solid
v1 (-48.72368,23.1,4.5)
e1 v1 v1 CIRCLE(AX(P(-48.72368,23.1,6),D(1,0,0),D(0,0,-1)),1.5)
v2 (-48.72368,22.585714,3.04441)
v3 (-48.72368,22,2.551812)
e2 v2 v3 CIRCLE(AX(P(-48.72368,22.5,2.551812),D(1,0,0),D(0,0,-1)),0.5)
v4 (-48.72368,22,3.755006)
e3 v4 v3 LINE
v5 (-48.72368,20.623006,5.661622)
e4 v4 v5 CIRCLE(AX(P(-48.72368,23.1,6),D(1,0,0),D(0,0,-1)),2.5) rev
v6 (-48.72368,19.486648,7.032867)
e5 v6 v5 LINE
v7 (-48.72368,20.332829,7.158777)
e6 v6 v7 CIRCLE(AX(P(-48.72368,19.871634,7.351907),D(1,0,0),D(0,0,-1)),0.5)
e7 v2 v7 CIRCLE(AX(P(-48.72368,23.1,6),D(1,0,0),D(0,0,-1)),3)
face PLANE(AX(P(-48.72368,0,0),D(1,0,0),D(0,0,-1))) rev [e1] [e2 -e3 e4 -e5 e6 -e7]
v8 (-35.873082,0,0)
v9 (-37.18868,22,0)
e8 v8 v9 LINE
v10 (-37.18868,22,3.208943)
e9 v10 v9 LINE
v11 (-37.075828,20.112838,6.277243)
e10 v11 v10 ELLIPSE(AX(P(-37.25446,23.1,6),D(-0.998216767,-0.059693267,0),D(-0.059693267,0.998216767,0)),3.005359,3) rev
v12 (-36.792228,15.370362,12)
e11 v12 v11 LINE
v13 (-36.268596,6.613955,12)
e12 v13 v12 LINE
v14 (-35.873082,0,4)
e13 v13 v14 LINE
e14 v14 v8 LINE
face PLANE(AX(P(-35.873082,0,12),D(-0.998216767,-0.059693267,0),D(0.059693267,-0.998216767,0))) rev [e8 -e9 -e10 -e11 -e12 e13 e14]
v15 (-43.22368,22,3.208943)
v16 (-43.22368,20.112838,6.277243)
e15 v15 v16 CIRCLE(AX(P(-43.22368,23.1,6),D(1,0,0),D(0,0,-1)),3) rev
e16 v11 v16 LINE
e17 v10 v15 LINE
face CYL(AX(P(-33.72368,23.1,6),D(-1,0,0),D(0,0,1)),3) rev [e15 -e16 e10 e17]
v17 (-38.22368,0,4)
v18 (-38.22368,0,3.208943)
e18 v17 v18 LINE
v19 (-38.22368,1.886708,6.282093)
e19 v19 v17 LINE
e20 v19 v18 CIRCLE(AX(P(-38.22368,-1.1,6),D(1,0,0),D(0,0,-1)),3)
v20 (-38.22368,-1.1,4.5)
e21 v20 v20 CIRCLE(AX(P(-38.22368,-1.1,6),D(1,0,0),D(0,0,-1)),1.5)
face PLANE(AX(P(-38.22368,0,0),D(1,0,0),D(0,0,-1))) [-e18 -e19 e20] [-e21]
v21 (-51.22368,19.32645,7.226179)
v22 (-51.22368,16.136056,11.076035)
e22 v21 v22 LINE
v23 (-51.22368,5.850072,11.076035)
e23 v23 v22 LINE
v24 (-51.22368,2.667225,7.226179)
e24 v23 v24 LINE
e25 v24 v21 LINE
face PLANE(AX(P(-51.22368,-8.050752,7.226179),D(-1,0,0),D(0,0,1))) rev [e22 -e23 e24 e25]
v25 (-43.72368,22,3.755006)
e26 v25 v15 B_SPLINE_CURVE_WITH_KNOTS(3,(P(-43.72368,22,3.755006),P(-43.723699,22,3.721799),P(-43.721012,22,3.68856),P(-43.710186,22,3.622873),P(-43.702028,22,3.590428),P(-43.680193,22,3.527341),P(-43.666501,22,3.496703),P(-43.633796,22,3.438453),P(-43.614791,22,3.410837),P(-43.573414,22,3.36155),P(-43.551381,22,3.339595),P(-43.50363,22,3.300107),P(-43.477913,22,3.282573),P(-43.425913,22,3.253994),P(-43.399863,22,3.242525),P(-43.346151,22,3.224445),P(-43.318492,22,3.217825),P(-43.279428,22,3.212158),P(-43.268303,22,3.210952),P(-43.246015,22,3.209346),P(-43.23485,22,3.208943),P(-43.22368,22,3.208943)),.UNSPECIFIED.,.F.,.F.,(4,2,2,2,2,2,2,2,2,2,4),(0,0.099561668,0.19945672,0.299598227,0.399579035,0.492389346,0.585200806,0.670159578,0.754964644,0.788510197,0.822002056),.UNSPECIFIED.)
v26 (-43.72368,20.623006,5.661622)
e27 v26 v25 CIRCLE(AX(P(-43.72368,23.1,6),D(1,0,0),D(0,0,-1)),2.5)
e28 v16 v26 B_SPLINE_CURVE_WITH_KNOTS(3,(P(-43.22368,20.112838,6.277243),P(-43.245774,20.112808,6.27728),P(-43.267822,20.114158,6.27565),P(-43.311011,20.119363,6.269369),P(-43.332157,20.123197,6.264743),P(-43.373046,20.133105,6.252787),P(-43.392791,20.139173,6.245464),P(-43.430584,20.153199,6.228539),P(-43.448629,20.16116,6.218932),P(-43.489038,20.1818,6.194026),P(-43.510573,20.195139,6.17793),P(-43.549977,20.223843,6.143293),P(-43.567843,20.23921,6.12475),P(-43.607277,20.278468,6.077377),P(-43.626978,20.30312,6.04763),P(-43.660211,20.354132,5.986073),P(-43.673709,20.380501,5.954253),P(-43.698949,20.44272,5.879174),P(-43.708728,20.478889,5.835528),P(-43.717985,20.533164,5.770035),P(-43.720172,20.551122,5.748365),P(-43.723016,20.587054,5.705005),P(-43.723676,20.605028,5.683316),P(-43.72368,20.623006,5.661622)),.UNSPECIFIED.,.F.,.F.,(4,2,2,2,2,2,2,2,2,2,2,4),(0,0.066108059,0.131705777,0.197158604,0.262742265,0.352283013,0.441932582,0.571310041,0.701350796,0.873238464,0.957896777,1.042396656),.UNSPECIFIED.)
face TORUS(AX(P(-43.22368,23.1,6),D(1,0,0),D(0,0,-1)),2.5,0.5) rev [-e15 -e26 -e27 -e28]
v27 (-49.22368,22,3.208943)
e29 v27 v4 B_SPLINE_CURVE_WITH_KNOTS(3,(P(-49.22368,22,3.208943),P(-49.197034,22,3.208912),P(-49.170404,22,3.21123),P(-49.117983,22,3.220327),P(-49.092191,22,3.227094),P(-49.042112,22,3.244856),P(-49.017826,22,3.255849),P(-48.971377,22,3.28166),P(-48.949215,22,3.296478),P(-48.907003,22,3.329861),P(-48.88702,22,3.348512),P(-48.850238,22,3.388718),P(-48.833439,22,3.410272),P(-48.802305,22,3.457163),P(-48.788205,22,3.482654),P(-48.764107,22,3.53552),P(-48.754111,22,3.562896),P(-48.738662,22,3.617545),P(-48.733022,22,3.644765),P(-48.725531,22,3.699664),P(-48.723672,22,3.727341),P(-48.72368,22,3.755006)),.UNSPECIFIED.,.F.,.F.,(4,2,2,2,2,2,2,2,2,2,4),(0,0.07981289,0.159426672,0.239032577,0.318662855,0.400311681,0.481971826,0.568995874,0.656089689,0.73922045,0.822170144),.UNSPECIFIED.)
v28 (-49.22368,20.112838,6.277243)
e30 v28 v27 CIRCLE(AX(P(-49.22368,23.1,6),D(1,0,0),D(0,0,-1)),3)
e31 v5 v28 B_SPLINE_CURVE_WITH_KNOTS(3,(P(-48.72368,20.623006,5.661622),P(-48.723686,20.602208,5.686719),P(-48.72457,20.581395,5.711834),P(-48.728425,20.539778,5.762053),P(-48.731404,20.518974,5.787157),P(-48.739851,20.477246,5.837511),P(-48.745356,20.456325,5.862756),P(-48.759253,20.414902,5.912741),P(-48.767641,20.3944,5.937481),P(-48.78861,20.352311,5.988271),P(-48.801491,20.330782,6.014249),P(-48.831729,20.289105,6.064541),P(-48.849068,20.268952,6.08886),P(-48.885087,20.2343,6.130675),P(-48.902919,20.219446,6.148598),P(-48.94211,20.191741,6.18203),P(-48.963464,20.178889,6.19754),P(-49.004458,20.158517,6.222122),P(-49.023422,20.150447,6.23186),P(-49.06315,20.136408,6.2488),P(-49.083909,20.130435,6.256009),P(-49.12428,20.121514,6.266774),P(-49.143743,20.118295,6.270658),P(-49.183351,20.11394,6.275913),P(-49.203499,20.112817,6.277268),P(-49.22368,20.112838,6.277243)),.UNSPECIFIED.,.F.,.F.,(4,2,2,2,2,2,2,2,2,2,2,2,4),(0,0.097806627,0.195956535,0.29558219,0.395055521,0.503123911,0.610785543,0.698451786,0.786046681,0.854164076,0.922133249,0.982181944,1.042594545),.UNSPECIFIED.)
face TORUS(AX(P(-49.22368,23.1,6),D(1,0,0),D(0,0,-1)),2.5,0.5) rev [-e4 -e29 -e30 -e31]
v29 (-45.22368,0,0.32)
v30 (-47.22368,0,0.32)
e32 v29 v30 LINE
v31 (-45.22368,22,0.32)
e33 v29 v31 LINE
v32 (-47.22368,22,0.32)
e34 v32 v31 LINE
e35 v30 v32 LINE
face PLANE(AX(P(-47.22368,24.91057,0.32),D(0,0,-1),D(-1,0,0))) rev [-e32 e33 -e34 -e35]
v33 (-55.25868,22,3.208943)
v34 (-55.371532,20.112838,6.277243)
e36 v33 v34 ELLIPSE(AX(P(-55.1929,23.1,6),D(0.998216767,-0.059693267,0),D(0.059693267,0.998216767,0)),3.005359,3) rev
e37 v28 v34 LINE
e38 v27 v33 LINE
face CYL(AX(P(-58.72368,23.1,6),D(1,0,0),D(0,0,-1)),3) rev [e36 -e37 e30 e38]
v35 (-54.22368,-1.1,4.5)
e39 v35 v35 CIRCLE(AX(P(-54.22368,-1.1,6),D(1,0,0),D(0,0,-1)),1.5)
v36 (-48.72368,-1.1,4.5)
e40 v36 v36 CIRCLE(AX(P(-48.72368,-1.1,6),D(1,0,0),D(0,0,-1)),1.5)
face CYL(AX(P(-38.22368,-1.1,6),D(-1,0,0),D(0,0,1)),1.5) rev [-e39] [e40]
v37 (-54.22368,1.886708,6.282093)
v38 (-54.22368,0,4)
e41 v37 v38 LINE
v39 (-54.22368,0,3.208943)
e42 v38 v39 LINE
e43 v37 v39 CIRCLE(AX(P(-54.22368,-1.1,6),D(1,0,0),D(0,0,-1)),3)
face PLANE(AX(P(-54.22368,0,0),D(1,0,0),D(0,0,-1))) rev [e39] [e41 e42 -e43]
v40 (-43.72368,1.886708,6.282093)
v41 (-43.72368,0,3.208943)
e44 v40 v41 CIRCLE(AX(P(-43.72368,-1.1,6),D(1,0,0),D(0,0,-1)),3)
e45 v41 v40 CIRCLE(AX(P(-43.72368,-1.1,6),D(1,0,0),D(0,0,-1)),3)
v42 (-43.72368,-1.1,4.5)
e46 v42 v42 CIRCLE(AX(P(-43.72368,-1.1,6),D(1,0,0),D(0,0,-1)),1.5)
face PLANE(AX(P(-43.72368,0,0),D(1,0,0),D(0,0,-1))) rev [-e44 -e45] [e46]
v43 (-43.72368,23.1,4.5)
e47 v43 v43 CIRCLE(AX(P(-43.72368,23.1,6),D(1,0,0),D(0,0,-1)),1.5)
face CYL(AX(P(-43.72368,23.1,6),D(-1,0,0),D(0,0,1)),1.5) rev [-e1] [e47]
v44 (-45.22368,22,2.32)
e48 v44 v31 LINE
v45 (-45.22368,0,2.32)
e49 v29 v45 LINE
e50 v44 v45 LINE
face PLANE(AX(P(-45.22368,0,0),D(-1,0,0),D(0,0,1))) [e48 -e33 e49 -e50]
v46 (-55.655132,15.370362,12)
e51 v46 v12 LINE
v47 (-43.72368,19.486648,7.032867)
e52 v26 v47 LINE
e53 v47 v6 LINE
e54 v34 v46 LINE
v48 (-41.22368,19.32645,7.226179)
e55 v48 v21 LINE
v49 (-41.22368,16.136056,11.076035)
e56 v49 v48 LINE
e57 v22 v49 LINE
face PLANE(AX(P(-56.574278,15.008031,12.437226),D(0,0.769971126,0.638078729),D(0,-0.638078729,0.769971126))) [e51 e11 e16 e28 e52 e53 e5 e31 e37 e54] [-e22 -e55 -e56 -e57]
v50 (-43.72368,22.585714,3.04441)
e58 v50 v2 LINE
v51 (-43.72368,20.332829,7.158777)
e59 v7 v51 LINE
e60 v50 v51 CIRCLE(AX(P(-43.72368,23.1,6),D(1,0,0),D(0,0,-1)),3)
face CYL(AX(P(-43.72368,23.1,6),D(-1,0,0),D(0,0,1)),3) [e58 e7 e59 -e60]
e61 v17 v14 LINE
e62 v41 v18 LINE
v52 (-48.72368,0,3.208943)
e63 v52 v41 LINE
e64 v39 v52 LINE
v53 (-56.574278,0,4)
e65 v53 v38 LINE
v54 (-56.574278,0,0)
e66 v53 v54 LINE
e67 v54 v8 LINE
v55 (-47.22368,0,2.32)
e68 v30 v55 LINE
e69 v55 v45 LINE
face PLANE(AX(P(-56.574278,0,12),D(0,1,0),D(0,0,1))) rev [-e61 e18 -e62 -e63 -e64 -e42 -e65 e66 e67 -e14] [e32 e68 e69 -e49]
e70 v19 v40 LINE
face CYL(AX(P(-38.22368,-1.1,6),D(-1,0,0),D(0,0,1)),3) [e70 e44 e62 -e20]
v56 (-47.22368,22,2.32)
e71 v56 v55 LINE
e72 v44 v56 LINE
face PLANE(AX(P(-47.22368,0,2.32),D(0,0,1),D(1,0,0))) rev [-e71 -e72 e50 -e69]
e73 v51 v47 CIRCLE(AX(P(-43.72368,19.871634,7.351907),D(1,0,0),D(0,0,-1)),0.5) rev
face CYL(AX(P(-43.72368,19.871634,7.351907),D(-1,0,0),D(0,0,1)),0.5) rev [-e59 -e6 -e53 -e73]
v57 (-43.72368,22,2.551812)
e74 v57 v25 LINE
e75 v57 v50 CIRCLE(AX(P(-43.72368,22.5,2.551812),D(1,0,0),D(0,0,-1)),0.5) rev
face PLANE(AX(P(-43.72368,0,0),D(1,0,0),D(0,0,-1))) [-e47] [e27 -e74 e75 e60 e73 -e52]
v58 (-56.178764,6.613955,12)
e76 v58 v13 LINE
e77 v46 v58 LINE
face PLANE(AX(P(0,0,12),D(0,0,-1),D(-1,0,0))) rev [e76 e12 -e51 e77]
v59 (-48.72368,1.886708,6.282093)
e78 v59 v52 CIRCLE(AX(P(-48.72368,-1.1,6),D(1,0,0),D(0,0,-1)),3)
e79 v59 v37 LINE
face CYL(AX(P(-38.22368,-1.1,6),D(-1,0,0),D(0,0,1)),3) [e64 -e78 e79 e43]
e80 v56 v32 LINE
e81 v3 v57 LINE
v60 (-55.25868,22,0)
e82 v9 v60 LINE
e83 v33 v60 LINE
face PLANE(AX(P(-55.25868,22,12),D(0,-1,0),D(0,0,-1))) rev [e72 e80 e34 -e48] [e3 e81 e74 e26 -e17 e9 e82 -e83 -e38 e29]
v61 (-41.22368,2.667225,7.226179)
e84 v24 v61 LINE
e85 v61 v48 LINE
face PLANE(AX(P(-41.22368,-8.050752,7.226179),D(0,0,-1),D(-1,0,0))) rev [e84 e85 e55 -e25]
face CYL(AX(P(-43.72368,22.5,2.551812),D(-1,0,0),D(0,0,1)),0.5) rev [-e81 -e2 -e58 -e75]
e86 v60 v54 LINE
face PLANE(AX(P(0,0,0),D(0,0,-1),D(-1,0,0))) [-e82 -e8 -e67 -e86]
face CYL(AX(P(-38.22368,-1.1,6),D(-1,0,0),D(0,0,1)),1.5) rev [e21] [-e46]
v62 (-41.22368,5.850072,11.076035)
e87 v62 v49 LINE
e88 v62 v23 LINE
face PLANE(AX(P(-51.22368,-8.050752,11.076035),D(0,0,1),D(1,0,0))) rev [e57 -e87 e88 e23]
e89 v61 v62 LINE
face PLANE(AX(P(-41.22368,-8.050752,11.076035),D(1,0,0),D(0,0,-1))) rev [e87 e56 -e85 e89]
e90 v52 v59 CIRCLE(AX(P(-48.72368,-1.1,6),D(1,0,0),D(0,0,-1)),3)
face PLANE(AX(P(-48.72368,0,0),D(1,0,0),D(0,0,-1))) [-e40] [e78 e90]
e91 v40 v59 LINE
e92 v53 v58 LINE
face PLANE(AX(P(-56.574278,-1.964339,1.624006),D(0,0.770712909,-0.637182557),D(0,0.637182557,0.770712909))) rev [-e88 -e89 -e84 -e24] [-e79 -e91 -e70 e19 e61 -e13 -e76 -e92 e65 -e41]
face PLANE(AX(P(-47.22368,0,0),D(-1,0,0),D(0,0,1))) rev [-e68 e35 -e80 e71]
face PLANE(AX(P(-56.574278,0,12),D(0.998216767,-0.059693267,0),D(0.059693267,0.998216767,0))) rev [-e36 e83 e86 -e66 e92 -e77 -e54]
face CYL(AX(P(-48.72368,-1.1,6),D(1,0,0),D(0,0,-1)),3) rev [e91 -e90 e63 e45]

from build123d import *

# Parameters (mm, degrees)
BOSS_EXTRUDE1_DEPTH            = 12
CUT_EXTRUDE1_DEPTH             = 28.113370808
CUT_EXTRUDE1_DEPTH_BACK        = 28.113370808
SKETCH6_R                      = 3
SKETCH6_R_2                    = 1.5
BOSS_EXTRUDE2_DEPTH            = 8
SKETCH6_3_R                    = 3
SKETCH6_3_R_2                  = 1.5
CUT_EXTRUDE2_DEPTH             = 2.5
CUT_EXTRUDE3_DEPTH             = 28.113370808
CUT_EXTRUDE3_DEPTH_BACK        = 28.113370808
SKETCH9_R                      = 3
SKETCH9_R_2                    = 1.5
BOSS_EXTRUDE3_DEPTH            = 2.5
CUT_EXTRUDE4_START             = 10
SKETCH11_R                     = 3
CUT_EXTRUDE4_DEPTH             = 10
SKETCH12_R                     = 3
CUT_EXTRUDE5_DEPTH             = 10
FILLET1_R                      = 0.5
FILLET2_R                      = 0.5
CUT_EXTRUDE6_REACH             = 62.032
SKETCH14_W                     = 10
SKETCH14_H                     = 3.849855631
CUT_EXTRUDE6_DIRECTION_2_REACH = 62.032
CUT_EXTRUDE7_DEPTH             = 1


with BuildPart() as part:
    # Sketch1 → Boss-Extrude1 (new body)
    with BuildSketch(Plane.XY):
        Polygon((-56.5742778, 0), (-35.873082033, 0), (-37.188679916, 22), (-55.258679916, 22), align=None)
    extrude(amount=BOSS_EXTRUDE1_DEPTH)

    # Sketch3 → Cut-Extrude1 (cut, two sides: drawn at the far end of the back side and taken through both)
    with BuildSketch(Plane(origin=(-46.223679916, 0, 0), x_dir=(0, 0, -1), z_dir=(1, 0, 0)).offset(-CUT_EXTRUDE1_DEPTH_BACK)):
        Polygon((-12, 0), (-4, 0), (-12, 6.613954944), align=None)
    extrude(amount=CUT_EXTRUDE1_DEPTH + CUT_EXTRUDE1_DEPTH_BACK, mode=Mode.SUBTRACT)

    # Sketch6 → Boss-Extrude2 (add, symmetric)
    with BuildSketch(Plane(origin=(-46.223679916, 0, 0), x_dir=(0, 0, -1), z_dir=(1, 0, 0))):
        with Locations((-6, -1.1)):
            Circle(SKETCH6_R)
        with Locations((-6, -1.1)):
            Circle(SKETCH6_R_2, mode=Mode.SUBTRACT)
    extrude(amount=BOSS_EXTRUDE2_DEPTH, both=True)

    # Sketch6<3> → Cut-Extrude2 (cut, symmetric)
    with BuildSketch(Plane(origin=(-46.223679916, 0, 0), x_dir=(0, 0, -1), z_dir=(1, 0, 0))):
        with Locations((-6, -1.1)):
            Circle(SKETCH6_3_R)
        with Locations((-6, -1.1)):
            Circle(SKETCH6_3_R_2, mode=Mode.SUBTRACT)
    extrude(amount=CUT_EXTRUDE2_DEPTH, both=True, mode=Mode.SUBTRACT)

    # Sketch8 → Cut-Extrude3 (cut, two sides: drawn at the far end of the back side and taken through both)
    with BuildSketch(Plane(origin=(-46.223679916, 0, 0), x_dir=(0, 0, -1), z_dir=(1, 0, 0)).offset(-CUT_EXTRUDE3_DEPTH_BACK)):
        Polygon((-12, 15.370362001), (-4, 22), (-12, 22), align=None)
    extrude(amount=CUT_EXTRUDE3_DEPTH + CUT_EXTRUDE3_DEPTH_BACK, mode=Mode.SUBTRACT)

    # Sketch9 → Boss-Extrude3 (add, symmetric)
    with BuildSketch(Plane(origin=(-46.223679916, 0, 0), x_dir=(0, 0, -1), z_dir=(1, 0, 0))):
        with Locations((-6, 23.1)):
            Circle(SKETCH9_R)
        with Locations((-6, 23.1)):
            Circle(SKETCH9_R_2, mode=Mode.SUBTRACT)
    extrude(amount=BOSS_EXTRUDE3_DEPTH, both=True)

    # Sketch11 → Cut-Extrude4 (cut)
    with BuildSketch(Plane(origin=(-43.723679916, 0, 0), x_dir=(0, 0, -1), z_dir=(1, 0, 0)).offset(CUT_EXTRUDE4_START)):
        with Locations((-6, 23.1)):
            Circle(SKETCH11_R)
    extrude(amount=-CUT_EXTRUDE4_DEPTH, mode=Mode.SUBTRACT)

    # Sketch12 → Cut-Extrude5 (cut)
    with BuildSketch(Plane.ZY.offset(48.723679916)):
        with Locations((6, 23.1)):
            Circle(SKETCH12_R)
    extrude(amount=CUT_EXTRUDE5_DEPTH, mode=Mode.SUBTRACT)

    # Fillet1
    fillet1_edges = [part.edges().sort_by_distance(p)[0] for p in [
        (-46.223679916, 22, 3.208942853),
        (-46.223679916, 20.112838065, 6.277242812),
    ]]
    fillet(fillet1_edges, radius=FILLET1_R)

    # Fillet2
    fillet2_edges = [part.edges().sort_by_distance(p)[0] for p in [
        (-48.723679916, 20.54464497, 4.42832552),
        (-43.723679916, 20.54464497, 4.42832552),
    ]]
    fillet(fillet2_edges, radius=FILLET2_R)

    # Cut-Extrude6: up to this plane
    cut_extrude6_end = Plane(origin=(-56.5742778, -1.96433929, 1.624006445), z_dir=(0, 0.7707129094412332, -0.6371825572162422))
    # Sketch14 → Cut-Extrude6 (cut, up to the surface)
    with BuildSketch(Plane(origin=(0, 10, 0), x_dir=(1, 0, 0), z_dir=(0, 1, 0)), mode=Mode.PRIVATE) as cut_extrude6_sk1:
        with Locations((-46.223679916, -9.151106834)):
            Rectangle(SKETCH14_W, SKETCH14_H)
    cut_extrude6_tool1 = split(extrude(cut_extrude6_sk1.sketch, amount=-CUT_EXTRUDE6_REACH, mode=Mode.PRIVATE), bisect_by=cut_extrude6_end, keep=Keep.BOTH, mode=Mode.PRIVATE)
    add(cut_extrude6_tool1.solids().sort_by_distance((-46.22368, 10, 9.151107))[0], mode=Mode.SUBTRACT)

    # Cut-Extrude6 direction 2: up to this plane
    cut_extrude6_direction_2_end = Plane(origin=(-56.5742778, 15.008030561, 12.437226213), z_dir=(0, 0.769971126082772, 0.6380787294674757))
    # Sketch14 → Cut-Extrude6 direction 2 (cut, up to the surface)
    with BuildSketch(Plane(origin=(0, 10, 0), x_dir=(1, 0, 0), z_dir=(0, 1, 0)), mode=Mode.PRIVATE) as cut_extrude6_direction_2_sk1:
        with Locations((-46.223679916, -9.151106834)):
            Rectangle(SKETCH14_W, SKETCH14_H)
    cut_extrude6_direction_2_tool1 = split(extrude(cut_extrude6_direction_2_sk1.sketch, amount=CUT_EXTRUDE6_DIRECTION_2_REACH, mode=Mode.PRIVATE), bisect_by=cut_extrude6_direction_2_end, keep=Keep.BOTH, mode=Mode.PRIVATE)
    add(cut_extrude6_direction_2_tool1.solids().sort_by_distance((-46.22368, 10, 9.151107))[0], mode=Mode.SUBTRACT)

    # Sketch15 → Cut-Extrude7 (cut, symmetric)
    with BuildSketch(Plane(origin=(-46.223679916, 0, 0), x_dir=(0, 0, -1), z_dir=(1, 0, 0))):
        Polygon((-2.32, 0), (-2.32, 24.910570124), (-0.32, 24.910570124), (-0.32, -0.739577641), (-2.32, -0.739577641), align=None)
    extrude(amount=CUT_EXTRUDE7_DEPTH, both=True, mode=Mode.SUBTRACT)


solid = part.part
